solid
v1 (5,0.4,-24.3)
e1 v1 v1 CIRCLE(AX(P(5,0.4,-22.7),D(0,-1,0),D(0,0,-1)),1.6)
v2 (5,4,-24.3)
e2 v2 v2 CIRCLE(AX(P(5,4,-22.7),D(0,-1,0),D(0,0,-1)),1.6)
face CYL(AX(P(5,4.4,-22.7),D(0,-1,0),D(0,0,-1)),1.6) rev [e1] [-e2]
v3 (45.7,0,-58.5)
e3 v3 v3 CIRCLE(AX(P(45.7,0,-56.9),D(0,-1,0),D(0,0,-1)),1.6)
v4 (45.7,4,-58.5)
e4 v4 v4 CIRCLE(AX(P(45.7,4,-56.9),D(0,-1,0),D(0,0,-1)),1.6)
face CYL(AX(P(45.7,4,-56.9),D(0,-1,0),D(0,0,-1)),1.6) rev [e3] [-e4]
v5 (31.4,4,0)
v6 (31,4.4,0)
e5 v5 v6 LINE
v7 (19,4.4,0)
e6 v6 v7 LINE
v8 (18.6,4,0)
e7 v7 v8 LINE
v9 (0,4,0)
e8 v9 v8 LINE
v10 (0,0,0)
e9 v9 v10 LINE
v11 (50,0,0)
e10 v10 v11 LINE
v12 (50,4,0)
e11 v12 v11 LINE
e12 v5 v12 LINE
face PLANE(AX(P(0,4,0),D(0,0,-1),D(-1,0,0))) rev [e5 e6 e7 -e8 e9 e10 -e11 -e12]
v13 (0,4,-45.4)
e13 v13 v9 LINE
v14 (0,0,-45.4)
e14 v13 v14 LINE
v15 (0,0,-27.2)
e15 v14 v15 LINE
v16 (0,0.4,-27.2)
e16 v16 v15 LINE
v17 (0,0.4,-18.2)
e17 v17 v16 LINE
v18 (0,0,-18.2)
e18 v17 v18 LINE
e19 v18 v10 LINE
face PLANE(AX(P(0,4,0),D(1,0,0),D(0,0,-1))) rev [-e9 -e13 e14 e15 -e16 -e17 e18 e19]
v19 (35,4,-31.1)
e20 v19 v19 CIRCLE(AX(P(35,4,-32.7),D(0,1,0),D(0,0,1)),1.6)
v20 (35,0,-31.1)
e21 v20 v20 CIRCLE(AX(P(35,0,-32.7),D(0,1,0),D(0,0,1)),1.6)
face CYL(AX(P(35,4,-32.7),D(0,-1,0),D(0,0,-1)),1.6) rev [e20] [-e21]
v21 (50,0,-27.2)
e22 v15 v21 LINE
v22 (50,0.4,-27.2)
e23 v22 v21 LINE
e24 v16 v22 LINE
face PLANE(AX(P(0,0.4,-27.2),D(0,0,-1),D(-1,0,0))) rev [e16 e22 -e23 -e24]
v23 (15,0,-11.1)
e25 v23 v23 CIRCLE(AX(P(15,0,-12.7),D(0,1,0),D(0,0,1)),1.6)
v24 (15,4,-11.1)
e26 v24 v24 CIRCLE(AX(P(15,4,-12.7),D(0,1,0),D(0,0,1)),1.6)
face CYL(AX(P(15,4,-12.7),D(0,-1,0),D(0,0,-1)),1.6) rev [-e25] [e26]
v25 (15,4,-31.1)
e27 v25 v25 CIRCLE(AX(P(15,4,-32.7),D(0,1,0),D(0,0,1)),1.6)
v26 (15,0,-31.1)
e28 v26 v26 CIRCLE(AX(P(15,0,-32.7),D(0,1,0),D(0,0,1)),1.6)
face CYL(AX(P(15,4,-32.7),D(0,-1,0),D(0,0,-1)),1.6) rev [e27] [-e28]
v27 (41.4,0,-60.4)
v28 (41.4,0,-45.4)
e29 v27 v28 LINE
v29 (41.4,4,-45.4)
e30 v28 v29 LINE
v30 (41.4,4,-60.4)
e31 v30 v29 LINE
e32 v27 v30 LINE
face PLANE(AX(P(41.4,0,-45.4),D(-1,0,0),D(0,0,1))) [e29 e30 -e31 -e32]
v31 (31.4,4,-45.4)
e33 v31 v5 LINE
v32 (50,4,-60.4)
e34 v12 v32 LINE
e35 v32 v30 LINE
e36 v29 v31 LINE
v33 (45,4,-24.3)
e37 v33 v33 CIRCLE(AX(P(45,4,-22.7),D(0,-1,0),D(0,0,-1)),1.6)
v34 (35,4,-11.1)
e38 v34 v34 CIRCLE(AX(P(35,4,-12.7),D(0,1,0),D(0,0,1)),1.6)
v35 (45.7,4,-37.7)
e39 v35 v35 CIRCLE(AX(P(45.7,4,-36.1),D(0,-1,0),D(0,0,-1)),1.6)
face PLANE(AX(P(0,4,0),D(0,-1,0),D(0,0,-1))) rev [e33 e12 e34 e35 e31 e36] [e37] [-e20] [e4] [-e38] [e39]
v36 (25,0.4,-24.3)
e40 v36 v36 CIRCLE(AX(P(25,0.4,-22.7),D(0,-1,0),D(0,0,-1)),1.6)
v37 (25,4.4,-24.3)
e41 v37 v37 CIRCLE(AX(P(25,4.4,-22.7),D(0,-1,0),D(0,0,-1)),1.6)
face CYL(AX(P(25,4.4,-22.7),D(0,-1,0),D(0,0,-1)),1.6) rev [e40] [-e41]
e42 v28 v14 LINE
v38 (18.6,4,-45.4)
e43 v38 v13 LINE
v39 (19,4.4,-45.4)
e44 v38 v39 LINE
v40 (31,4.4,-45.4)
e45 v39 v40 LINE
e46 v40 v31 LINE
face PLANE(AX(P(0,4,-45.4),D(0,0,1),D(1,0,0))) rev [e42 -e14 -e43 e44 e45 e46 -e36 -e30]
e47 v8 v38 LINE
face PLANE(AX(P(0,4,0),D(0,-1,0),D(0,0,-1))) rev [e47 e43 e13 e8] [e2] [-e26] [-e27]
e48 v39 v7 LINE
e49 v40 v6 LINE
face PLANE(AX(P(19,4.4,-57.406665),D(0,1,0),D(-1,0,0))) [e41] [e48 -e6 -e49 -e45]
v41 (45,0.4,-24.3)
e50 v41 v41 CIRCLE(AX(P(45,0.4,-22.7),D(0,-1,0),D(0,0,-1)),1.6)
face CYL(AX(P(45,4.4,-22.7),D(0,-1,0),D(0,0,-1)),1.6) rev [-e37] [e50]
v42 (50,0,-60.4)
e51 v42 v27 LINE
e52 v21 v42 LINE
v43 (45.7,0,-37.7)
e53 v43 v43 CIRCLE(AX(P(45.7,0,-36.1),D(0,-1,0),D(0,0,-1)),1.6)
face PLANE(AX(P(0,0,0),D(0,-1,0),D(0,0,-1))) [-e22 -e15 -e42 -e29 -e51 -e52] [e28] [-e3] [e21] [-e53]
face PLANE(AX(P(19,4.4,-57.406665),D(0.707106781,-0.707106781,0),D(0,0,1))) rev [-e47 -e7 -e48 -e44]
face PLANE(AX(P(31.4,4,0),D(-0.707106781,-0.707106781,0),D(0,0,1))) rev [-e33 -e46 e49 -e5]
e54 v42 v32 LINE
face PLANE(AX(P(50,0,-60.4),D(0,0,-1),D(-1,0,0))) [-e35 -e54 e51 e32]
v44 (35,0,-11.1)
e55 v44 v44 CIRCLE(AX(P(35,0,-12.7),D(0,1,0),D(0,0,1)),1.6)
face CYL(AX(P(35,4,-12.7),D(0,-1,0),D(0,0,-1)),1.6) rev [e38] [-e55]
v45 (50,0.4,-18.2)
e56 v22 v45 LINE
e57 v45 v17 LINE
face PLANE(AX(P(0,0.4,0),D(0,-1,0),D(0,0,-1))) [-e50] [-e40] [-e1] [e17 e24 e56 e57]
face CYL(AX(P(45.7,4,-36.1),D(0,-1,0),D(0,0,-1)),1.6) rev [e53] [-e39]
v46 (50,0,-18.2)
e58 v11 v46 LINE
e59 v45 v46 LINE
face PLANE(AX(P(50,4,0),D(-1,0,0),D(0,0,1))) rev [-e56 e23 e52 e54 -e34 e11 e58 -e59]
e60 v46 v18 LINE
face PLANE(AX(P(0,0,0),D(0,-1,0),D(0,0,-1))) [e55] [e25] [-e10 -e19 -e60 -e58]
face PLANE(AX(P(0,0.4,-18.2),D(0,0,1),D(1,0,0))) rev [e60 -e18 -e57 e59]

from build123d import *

# Parameters (mm, degrees)
SKETCH_1_W          = 50
SKETCH_1_H          = 45.4
SKETCH_1_R          = 1.6
EXTRUDE_1_DEPTH     = 4
SKETCH_2_W          = 12
SKETCH_2_H          = 0.4
EXTRUDE_2_DEPTH     = 45.4
CHAMFER_1_SIZE      = 0.4
SKETCH_3_W          = 50
SKETCH_3_H          = 9
CUT_EXTRUDE_1_DEPTH = 0.4
SKETCH_4_R          = 1.6
CUT_EXTRUDE_2_DEPTH = 68.654711588
SKETCH_5_W          = 8.6
SKETCH_5_H          = 15
EXTRUDE_3_DEPTH     = 4
SKETCH_6_R          = 1.6
CUT_EXTRUDE_3_DEPTH = 4


with BuildPart() as part:
    # 草图1 → 凸台-拉伸1 (new body)
    with BuildSketch(Plane(origin=(0, 0, 0), x_dir=(1, 0, 0), z_dir=(0, 1, 0))):
        with Locations((25, 22.7)):
            Rectangle(SKETCH_1_W, SKETCH_1_H)
        with Locations(Location((15, 32.7, 0), (0, 0, 270))):
            Circle(SKETCH_1_R, mode=Mode.SUBTRACT)
        with Locations(Location((35, 32.7, 0), (0, 0, 270))):
            Circle(SKETCH_1_R, mode=Mode.SUBTRACT)
        with Locations(Location((35, 12.7, 0), (0, 0, 270))):
            Circle(SKETCH_1_R, mode=Mode.SUBTRACT)
        with Locations(Location((15, 12.7, 0), (0, 0, 270))):
            Circle(SKETCH_1_R, mode=Mode.SUBTRACT)
    extrude(amount=EXTRUDE_1_DEPTH)

    # 草图2 → 凸台-拉伸2 (add)
    with BuildSketch(Plane.XY):
        with Locations((25, 4.2)):
            Rectangle(SKETCH_2_W, SKETCH_2_H)
    extrude(amount=-EXTRUDE_2_DEPTH)

    # 倒角1
    chamfer_1_edges = [part.edges().sort_by_distance(p)[0] for p in [
        (31, 4, -22.7),
        (19, 4, -22.7),
    ]]
    chamfer(chamfer_1_edges, length=CHAMFER_1_SIZE - 0.0001)  # a hair under: the kernel refuses the full size

    # 草图3 → 切除-拉伸1 (cut)
    with BuildSketch(Plane(origin=(0, 0, 0), x_dir=(-1, 0, 0), z_dir=(0, -1, 0))):
        with Locations((-25, 22.7)):
            Rectangle(SKETCH_3_W, SKETCH_3_H)
    extrude(amount=-CUT_EXTRUDE_1_DEPTH, mode=Mode.SUBTRACT)

    # 草图4 → 切除-拉伸2 (cut, through all)
    with BuildSketch(Plane(origin=(0, 0.4, 0), x_dir=(-1, 0, 0), z_dir=(0, -1, 0))):
        with Locations(Location((-5, 22.7, 0), (0, 0, 90))):
            Circle(SKETCH_4_R)
        with Locations(Location((-25, 22.7, 0), (0, 0, 90))):
            Circle(SKETCH_4_R)
        with Locations(Location((-45, 22.7, 0), (0, 0, 90))):
            Circle(SKETCH_4_R)
    extrude(amount=-CUT_EXTRUDE_2_DEPTH, mode=Mode.SUBTRACT)

    # 草图5 → 凸台-拉伸3 (add)
    with BuildSketch(Plane(origin=(0, 4, 0), x_dir=(1, 0, 0), z_dir=(0, 1, 0))):
        with Locations((45.7, 52.9)):
            Rectangle(SKETCH_5_W, SKETCH_5_H)
    extrude(amount=-EXTRUDE_3_DEPTH)

    # 草图6 → 切除-拉伸3 (cut)
    with BuildSketch(Plane.XZ):
        with Locations(Location((45.7, -56.9, 0), (0, 0, 270))):
            Circle(SKETCH_6_R)
        with Locations(Location((45.7, -36.1, 0), (0, 0, 270))):
            Circle(SKETCH_6_R)
    extrude(amount=-CUT_EXTRUDE_3_DEPTH, mode=Mode.SUBTRACT)


solid = part.part
